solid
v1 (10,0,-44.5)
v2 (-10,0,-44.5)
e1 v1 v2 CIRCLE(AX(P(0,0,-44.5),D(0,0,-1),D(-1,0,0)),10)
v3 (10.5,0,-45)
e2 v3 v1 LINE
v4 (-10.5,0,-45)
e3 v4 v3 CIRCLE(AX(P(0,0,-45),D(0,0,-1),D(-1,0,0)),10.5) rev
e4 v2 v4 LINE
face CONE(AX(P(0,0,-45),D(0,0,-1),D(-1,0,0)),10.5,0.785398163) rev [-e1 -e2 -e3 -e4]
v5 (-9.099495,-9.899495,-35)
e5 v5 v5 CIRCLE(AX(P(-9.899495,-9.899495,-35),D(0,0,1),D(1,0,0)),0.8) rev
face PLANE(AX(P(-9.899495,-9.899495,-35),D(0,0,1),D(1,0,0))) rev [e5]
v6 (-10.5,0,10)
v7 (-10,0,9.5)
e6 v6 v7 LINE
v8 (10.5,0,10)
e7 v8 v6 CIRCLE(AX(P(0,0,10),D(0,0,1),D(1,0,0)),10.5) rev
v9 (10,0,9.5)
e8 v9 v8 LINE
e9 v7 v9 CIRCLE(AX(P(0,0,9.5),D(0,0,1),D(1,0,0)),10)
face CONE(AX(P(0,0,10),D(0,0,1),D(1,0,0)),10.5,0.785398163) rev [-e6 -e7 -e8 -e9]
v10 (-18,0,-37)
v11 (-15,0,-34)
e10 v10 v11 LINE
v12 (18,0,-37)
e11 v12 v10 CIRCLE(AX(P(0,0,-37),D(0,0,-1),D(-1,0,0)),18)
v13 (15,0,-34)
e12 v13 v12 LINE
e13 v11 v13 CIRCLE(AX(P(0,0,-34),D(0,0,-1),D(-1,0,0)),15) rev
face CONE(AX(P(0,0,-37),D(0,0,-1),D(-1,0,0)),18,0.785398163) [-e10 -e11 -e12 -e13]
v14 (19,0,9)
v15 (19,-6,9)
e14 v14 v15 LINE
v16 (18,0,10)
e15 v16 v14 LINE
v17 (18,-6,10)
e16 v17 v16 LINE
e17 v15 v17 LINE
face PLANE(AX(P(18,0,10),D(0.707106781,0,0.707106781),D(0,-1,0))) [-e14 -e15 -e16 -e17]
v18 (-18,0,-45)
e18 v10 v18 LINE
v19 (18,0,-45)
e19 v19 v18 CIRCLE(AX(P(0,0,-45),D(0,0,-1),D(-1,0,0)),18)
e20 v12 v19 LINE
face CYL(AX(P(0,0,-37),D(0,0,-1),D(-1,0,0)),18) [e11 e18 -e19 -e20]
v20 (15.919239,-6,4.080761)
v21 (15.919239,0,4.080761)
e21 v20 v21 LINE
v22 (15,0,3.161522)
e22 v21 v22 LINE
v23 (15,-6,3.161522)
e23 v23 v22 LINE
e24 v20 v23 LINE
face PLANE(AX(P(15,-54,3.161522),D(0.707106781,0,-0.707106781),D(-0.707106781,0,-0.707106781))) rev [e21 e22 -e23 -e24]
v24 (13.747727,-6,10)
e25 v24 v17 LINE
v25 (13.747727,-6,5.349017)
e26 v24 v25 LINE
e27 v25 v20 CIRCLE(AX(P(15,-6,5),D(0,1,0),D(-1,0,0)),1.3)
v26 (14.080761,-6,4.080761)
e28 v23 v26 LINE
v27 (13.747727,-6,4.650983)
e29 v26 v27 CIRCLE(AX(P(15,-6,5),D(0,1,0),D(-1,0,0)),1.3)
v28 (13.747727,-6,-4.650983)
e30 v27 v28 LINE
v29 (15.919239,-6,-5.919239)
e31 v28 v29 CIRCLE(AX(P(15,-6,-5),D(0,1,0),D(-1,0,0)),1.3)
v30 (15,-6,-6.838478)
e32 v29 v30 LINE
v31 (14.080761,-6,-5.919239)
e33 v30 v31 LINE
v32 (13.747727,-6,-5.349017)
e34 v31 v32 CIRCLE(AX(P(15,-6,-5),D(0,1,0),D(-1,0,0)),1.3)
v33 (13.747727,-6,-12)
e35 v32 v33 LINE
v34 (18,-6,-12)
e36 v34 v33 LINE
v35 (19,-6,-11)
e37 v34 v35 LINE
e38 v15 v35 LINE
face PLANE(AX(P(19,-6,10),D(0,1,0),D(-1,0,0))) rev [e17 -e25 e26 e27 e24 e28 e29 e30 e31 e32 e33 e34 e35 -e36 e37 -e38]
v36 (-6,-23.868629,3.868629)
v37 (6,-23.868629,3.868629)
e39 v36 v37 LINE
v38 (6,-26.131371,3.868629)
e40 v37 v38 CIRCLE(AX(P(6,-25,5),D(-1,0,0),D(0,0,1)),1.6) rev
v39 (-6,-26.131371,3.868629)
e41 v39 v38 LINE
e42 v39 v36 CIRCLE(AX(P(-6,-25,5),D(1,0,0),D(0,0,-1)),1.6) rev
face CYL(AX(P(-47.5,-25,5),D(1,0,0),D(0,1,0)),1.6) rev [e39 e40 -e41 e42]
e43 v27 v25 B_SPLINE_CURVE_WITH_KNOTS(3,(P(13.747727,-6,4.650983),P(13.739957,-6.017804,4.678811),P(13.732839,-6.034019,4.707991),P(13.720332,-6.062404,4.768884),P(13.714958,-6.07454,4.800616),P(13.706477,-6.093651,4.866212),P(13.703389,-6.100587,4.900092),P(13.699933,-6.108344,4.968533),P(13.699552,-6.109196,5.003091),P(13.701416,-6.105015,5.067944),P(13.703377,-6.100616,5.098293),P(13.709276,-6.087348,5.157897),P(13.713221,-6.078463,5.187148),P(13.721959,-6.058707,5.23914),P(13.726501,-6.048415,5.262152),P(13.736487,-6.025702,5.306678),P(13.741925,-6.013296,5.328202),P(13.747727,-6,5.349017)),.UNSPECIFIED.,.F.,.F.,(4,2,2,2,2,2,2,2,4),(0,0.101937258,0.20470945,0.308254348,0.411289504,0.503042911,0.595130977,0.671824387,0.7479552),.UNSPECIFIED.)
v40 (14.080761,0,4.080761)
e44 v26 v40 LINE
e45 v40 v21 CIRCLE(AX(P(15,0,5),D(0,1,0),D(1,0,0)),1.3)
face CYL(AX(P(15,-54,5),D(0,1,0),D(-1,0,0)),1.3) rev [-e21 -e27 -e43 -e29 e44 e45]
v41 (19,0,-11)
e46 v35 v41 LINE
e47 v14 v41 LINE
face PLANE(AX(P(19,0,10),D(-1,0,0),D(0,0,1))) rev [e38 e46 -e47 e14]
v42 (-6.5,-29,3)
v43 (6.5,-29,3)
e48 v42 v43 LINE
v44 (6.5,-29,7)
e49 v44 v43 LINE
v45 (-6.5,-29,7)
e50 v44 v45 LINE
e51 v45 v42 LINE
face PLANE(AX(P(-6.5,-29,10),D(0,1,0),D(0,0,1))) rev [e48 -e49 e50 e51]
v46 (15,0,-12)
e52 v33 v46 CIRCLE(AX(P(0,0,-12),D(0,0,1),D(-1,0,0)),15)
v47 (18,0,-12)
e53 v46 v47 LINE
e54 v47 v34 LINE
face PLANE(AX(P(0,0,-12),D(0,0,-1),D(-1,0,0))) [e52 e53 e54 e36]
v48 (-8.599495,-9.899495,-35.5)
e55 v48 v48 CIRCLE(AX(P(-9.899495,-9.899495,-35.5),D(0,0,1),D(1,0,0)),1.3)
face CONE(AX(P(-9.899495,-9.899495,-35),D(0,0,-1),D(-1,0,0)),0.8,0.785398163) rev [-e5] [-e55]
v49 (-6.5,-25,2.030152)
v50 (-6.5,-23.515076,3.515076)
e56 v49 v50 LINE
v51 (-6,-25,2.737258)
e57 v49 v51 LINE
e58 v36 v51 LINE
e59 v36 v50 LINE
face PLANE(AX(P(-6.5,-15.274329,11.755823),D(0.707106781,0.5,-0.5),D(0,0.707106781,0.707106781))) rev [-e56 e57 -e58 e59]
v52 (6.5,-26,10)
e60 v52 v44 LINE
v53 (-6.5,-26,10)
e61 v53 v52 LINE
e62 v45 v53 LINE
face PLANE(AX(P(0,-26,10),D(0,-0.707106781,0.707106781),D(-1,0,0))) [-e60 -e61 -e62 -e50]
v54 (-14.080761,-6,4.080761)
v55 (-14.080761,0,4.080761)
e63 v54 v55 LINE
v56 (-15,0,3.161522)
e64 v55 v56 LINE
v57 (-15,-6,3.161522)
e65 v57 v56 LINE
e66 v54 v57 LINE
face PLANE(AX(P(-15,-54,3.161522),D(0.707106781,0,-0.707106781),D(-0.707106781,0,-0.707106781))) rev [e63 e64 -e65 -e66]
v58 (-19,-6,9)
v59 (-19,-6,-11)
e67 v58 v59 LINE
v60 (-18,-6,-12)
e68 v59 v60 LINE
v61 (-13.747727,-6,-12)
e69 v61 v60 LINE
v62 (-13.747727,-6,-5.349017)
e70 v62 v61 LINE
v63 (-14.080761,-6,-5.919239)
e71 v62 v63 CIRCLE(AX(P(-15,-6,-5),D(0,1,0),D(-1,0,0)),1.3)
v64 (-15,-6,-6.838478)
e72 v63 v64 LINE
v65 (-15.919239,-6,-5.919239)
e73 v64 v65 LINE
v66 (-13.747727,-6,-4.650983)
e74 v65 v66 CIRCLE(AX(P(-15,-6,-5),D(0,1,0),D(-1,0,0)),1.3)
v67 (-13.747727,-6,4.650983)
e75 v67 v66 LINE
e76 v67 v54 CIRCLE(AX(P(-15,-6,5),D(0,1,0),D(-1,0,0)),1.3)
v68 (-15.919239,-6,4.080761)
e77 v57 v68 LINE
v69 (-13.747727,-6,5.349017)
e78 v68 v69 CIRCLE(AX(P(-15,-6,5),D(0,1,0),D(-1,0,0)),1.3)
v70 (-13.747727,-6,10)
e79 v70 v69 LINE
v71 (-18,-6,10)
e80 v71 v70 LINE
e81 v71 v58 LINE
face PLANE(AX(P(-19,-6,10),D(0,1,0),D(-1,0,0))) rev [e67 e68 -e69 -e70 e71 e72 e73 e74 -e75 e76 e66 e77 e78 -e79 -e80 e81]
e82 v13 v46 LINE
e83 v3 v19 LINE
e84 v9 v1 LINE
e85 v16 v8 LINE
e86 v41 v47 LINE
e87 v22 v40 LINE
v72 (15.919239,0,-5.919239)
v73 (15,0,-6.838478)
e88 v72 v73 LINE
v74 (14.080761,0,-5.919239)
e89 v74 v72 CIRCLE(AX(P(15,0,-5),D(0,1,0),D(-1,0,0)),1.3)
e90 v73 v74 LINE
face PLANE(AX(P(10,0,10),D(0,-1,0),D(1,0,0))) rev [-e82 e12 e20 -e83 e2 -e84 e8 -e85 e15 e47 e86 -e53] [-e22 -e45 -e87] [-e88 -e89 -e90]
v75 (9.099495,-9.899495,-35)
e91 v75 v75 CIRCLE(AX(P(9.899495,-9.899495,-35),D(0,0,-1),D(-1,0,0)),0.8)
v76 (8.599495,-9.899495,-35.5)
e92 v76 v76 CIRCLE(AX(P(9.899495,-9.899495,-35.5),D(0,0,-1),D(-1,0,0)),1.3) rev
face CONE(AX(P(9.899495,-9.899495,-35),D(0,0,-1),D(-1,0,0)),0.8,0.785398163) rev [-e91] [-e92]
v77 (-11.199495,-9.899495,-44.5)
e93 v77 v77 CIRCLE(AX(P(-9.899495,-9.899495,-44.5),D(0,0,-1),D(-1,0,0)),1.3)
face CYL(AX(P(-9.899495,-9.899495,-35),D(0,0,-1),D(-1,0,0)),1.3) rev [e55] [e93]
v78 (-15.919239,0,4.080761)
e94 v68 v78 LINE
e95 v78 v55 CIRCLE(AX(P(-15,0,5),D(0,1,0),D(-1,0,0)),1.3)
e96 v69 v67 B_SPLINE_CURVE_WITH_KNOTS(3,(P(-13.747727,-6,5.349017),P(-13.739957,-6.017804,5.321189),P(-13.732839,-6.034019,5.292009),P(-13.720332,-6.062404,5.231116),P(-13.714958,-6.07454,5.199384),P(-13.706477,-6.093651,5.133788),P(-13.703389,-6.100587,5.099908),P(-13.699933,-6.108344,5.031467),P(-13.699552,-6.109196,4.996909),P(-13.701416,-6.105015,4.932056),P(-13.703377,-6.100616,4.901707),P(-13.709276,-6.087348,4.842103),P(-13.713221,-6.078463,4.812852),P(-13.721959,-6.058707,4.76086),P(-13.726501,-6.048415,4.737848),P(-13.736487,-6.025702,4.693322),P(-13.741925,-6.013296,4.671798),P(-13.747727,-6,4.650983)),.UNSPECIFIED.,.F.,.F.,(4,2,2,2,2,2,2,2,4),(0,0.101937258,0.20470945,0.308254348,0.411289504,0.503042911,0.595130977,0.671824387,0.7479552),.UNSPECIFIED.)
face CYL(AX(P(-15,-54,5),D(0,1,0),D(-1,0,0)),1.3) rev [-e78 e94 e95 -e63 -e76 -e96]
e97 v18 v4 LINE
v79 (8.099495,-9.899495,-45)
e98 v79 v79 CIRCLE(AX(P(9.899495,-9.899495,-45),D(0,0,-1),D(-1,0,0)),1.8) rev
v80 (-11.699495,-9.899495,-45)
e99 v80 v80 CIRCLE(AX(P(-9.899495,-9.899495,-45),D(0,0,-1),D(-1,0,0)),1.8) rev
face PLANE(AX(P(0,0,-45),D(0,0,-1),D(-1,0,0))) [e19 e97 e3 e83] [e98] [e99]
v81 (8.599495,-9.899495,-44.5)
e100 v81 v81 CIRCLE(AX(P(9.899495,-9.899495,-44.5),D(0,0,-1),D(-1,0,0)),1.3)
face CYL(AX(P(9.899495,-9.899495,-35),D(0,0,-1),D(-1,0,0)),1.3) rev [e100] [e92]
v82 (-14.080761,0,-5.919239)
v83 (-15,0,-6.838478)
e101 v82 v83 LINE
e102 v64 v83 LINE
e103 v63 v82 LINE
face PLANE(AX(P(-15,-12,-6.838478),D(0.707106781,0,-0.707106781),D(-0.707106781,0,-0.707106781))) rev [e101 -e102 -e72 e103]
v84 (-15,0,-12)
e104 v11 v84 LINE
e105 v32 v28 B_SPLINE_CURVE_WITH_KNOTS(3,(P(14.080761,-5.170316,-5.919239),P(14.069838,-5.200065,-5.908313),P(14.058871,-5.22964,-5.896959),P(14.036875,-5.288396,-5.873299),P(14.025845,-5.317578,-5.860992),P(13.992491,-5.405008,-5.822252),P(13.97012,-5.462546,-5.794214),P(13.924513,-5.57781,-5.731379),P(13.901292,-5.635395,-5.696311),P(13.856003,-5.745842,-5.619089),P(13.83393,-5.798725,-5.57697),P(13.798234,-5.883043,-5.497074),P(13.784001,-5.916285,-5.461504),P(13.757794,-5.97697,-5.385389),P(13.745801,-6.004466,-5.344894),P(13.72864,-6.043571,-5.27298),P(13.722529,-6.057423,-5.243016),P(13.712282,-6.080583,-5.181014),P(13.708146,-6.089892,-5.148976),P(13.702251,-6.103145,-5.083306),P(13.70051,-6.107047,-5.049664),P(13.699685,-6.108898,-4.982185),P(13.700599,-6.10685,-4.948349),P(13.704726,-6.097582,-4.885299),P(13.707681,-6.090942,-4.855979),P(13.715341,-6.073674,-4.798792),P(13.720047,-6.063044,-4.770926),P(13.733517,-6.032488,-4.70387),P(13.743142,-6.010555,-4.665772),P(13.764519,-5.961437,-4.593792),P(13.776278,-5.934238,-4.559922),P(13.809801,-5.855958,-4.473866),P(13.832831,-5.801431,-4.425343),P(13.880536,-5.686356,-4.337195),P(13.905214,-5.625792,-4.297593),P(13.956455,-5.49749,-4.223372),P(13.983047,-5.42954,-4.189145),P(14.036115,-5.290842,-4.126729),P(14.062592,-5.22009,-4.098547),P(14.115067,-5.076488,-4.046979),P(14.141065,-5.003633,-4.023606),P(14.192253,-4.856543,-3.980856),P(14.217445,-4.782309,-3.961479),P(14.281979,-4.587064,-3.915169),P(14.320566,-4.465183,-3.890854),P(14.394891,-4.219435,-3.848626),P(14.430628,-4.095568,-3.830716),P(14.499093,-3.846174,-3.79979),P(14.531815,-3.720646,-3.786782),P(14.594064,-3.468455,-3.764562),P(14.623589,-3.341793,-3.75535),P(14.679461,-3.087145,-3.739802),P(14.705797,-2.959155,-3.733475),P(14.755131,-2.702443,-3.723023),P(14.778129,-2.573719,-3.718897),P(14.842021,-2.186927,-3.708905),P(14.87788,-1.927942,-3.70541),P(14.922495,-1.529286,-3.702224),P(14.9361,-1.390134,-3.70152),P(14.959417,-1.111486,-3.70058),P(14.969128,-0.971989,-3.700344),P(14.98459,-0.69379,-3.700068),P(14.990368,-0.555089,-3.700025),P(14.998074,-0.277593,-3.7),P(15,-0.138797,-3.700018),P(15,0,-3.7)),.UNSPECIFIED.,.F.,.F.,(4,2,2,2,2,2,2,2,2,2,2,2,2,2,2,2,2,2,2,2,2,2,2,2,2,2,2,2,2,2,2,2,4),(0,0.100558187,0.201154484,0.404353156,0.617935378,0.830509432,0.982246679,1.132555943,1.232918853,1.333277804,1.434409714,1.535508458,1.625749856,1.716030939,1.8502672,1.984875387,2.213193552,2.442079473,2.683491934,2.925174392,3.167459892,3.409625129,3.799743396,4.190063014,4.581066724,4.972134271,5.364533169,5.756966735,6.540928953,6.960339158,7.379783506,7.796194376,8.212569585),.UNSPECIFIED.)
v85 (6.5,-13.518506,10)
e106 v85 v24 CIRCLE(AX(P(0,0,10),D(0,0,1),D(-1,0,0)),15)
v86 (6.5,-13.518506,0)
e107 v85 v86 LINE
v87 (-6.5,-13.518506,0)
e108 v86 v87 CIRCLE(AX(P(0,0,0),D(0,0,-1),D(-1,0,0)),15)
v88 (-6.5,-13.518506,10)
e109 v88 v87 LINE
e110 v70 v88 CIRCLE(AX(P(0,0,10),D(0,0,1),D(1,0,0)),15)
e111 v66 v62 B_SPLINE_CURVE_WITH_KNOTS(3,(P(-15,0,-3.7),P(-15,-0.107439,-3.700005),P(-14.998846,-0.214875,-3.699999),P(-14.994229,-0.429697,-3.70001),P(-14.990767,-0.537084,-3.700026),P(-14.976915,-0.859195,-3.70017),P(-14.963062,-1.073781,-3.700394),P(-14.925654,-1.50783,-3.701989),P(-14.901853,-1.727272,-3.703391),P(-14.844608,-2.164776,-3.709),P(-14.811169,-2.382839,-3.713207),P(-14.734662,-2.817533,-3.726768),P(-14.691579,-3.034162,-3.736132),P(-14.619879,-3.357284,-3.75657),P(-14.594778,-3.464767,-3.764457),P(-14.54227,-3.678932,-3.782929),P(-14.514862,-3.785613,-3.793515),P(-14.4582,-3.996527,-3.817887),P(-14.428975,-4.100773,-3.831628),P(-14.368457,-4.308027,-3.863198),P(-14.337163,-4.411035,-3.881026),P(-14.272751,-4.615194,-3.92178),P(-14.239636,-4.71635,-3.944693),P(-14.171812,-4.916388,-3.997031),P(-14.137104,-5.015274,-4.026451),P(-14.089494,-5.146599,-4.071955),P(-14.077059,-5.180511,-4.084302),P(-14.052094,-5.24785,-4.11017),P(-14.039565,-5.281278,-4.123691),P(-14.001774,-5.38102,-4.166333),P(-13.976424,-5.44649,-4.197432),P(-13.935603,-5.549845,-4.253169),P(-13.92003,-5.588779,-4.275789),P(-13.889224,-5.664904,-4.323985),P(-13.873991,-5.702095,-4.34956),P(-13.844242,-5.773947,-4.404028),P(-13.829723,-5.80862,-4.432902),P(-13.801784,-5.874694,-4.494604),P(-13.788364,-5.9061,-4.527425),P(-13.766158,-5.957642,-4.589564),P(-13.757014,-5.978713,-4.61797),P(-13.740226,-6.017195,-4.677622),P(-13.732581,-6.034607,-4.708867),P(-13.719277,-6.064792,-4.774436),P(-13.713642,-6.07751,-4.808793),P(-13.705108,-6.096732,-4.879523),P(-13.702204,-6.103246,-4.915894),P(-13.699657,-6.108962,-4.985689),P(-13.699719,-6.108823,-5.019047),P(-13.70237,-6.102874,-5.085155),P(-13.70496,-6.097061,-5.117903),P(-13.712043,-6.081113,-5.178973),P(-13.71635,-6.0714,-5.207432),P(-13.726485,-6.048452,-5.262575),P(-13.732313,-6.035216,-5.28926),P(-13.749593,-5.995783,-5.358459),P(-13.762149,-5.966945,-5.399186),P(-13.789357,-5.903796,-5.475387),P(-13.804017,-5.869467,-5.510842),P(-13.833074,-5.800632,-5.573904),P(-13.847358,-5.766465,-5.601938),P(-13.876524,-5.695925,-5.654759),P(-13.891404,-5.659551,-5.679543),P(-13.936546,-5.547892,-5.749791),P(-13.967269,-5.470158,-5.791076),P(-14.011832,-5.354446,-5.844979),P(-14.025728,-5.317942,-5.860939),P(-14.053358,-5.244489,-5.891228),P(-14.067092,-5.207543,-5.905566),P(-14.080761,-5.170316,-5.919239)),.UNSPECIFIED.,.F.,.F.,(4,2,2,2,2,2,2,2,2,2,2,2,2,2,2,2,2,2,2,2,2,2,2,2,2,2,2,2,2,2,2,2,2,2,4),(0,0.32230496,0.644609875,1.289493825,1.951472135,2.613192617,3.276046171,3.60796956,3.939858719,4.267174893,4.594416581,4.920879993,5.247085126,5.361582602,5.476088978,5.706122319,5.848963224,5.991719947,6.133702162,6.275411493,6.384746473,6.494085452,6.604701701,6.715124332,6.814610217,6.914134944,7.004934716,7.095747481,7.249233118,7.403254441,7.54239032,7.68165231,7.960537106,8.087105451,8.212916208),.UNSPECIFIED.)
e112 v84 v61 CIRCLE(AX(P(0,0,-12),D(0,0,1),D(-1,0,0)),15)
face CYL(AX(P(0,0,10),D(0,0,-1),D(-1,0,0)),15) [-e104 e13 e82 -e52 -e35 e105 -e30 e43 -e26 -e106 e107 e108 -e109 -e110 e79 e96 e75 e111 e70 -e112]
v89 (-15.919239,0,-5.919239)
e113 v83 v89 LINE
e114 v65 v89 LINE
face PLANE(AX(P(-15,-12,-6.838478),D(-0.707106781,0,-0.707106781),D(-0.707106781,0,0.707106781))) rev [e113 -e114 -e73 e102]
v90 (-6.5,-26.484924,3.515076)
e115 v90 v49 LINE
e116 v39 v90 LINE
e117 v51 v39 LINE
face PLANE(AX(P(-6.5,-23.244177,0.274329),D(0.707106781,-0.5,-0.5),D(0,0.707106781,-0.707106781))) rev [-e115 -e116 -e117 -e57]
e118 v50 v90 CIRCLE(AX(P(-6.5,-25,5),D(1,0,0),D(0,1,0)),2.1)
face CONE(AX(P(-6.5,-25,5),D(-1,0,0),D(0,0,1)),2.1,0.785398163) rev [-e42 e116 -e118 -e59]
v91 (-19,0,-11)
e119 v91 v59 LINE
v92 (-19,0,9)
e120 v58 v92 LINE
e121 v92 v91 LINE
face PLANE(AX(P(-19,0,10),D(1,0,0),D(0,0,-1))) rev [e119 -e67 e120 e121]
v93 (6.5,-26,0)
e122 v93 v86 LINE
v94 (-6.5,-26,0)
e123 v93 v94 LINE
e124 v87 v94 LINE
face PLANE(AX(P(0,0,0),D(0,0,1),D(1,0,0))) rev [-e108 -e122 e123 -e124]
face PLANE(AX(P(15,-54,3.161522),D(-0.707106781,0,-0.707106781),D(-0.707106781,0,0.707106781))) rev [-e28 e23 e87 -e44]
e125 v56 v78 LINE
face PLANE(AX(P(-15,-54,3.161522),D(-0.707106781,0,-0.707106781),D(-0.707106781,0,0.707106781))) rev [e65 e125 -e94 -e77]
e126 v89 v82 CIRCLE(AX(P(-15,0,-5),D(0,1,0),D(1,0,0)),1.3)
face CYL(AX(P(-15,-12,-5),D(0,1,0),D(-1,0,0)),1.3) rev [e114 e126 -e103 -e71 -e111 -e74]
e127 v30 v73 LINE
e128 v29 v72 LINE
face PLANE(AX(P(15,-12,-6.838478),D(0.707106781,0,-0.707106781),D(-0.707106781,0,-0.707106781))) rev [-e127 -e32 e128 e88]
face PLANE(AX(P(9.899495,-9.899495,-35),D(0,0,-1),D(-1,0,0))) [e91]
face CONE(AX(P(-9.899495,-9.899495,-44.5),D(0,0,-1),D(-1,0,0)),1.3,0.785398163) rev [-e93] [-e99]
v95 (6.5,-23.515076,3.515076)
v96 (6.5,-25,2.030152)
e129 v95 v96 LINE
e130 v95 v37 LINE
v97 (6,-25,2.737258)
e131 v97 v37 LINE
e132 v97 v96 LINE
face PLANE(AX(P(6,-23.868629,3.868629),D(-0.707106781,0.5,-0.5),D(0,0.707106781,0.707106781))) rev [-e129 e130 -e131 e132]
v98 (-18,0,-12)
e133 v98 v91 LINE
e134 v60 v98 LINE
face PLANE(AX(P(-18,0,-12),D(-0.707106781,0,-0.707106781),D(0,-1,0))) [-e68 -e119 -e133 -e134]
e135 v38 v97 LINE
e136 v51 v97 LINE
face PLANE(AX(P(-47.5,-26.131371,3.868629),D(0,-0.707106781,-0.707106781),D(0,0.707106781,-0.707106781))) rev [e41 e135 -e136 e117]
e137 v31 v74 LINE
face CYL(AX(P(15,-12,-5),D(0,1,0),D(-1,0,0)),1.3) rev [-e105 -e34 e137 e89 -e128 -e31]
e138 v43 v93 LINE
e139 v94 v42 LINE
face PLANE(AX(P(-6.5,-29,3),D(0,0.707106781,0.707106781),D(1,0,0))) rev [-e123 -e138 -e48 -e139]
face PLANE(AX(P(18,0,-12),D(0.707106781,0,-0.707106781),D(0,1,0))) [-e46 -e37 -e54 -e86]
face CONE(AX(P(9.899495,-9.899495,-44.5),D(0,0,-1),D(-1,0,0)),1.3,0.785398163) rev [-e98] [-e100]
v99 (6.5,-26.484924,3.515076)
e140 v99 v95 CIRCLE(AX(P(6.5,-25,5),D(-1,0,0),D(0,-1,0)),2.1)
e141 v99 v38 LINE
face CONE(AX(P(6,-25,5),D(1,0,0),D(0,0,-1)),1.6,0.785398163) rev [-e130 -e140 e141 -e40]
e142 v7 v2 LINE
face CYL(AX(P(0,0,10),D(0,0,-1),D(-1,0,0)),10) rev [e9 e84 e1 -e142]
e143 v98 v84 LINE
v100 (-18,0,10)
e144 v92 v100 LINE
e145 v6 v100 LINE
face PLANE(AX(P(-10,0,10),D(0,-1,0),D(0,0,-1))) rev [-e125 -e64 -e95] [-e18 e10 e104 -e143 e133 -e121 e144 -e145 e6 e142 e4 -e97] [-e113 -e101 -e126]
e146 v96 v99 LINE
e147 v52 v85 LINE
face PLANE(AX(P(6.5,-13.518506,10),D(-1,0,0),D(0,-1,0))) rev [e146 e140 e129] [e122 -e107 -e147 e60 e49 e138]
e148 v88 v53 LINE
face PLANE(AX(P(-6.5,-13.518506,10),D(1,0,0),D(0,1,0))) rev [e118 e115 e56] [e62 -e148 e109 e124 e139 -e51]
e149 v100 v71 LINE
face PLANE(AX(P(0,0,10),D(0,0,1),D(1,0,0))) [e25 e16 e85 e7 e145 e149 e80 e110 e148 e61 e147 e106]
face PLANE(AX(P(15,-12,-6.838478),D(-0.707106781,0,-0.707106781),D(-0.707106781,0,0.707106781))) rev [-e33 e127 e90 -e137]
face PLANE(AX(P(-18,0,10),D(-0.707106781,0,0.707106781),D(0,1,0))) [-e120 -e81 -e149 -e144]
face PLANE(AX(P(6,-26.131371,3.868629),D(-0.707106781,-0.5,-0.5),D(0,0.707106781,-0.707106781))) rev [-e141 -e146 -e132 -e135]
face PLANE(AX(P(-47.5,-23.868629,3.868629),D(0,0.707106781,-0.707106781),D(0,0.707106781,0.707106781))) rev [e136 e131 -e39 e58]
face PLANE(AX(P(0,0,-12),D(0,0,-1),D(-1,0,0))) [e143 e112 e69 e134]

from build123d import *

# Parameters (mm, degrees)
EXTRUDE_1_DEPTH     = 10
CUT_EXTRUDE_1_DEPTH = 54
CUT_EXTRUDE_2_DEPTH = 54
EXTRUDE_START       = 45
EXTRUDE_2_DEPTH     = 45
CHAMFER_1_SIZE      = 3
EXTRUDE_START_2     = 12
EXTRUDE_3_DEPTH     = 12
CUT_EXTRUDE_4_DEPTH = 12
EXTRUDE_4_DEPTH     = 8
CHAMFER_7_SIZE      = 3
SKETCH_7_R          = 1.3
CUT_EXTRUDE_3_DEPTH = 10
CHAMFER_4_SIZE      = 1
CHAMFER_5_SIZE      = 0.5
CHAMFER_6_SIZE      = 0.5


with BuildPart() as part:
    # 草图1 → 凸台-拉伸1 (new body)
    with BuildSketch(Plane.XY):
        with BuildLine():
            Line((-10, 0), (-19, 0))
            Line((-19, 0), (-19, -6))
            Line((-19, -6), (-13.747727085, -6))
            ThreePointArc((-13.747727085, -6), (-10.799286806, -10.410350834), (-6.5, -13.518505835))
            Line((-6.5, -13.518505835), (-6.5, -29))
            Line((-6.5, -29), (6.5, -29))
            Line((6.5, -29), (6.5, -13.518505835))
            ThreePointArc((6.5, -13.518505835), (10.799286806, -10.410350834), (13.747727085, -6))
            Line((13.747727085, -6), (19, -6))
            Line((19, -6), (19, 0))
            Line((19, 0), (10, 0))
            ThreePointArc((10, 0), (0, -10), (-10, 0))
        make_face()
    extrude(amount=EXTRUDE_1_DEPTH)

    # 草图3 → 切除-拉伸1 (cut)
    with BuildSketch(Plane(origin=(6.5, 0, 0), x_dir=(0, 0, -1), z_dir=(1, 0, 0))):
        with BuildLine():
            Line((-3.86862915, -23.86862915), (-2.7372583, -25))
            Line((-2.7372583, -25), (-3.86862915, -26.13137085))
            ThreePointArc((-3.86862915, -26.13137085), (-6.6, -25), (-3.86862915, -23.86862915))
        make_face()
    extrude(amount=-CUT_EXTRUDE_1_DEPTH, mode=Mode.SUBTRACT)

    # 草图4 → 切除-拉伸2 (cut)
    with BuildSketch(Plane(origin=(0, 0, 0), x_dir=(1, 0, 0), z_dir=(0, 1, 0))):
        with BuildLine():
            Line((-15, -3.161522369), (-15.919238816, -4.080761184))
            ThreePointArc((-15.919238816, -4.080761184), (-15, -6.3), (-14.080761184, -4.080761184))
            Line((-14.080761184, -4.080761184), (-15, -3.161522369))
        make_face()
        with BuildLine():
            Line((15, -3.161522369), (14.080761184, -4.080761184))
            ThreePointArc((14.080761184, -4.080761184), (15, -6.3), (15.919238816, -4.080761184))
            Line((15.919238816, -4.080761184), (15, -3.161522369))
        make_face()
    extrude(amount=-CUT_EXTRUDE_2_DEPTH, mode=Mode.SUBTRACT)

    # 草图5 → 凸台-拉伸2 (add)
    with BuildSketch(Plane(origin=(0, 0, 0), x_dir=(-1, 0, 0), z_dir=(0, 0, -1)).offset(EXTRUDE_START)):
        with BuildLine():
            Line((10, 0), (15, 0))
            ThreePointArc((15, 0), (0, -15), (-15, 0))
            Line((-15, 0), (-10, 0))
            ThreePointArc((-10, 0), (0, -10), (10, 0))
        make_face()
    extrude(amount=-EXTRUDE_2_DEPTH)

    # 倒角1
    chamfer_1_edges = [part.edges().sort_by_distance(p)[0] for p in [
        (0, -29, 0),
        (0, -29, 10),
    ]]
    chamfer(chamfer_1_edges, length=CHAMFER_1_SIZE)

    # 草图8 → 凸台-拉伸3 (add)
    with BuildSketch(Plane(origin=(0, 0, 0), x_dir=(-1, 0, 0), z_dir=(0, 0, -1)).offset(EXTRUDE_START_2)):
        with BuildLine():
            Line((-15, 0), (-19, 0))
            Line((-19, 0), (-19, -6))
            Line((-19, -6), (-13.747727085, -6))
            ThreePointArc((-13.747727085, -6), (-14.683594694, -3.064644655), (-15, 0))
        make_face()
        with BuildLine():
            Line((13.747727085, -6), (19, -6))
            Line((19, -6), (19, 0))
            Line((19, 0), (15, 0))
            ThreePointArc((15, 0), (14.683594694, -3.064644655), (13.747727085, -6))
        make_face()
    extrude(amount=-EXTRUDE_3_DEPTH)

    # 草图9 → 切除-拉伸4 (cut)
    with BuildSketch(Plane(origin=(0, 0, 0), x_dir=(1, 0, 0), z_dir=(0, 1, 0))):
        with BuildLine():
            Line((15, 6.838477631), (14.080761184, 5.919238816))
            ThreePointArc((14.080761184, 5.919238816), (15, 3.7), (15.919238816, 5.919238816))
            Line((15.919238816, 5.919238816), (15, 6.838477631))
        make_face()
        with BuildLine():
            Line((-15, 6.838477631), (-15.919238816, 5.919238816))
            ThreePointArc((-15.919238816, 5.919238816), (-15, 3.7), (-14.080761184, 5.919238816))
            Line((-14.080761184, 5.919238816), (-15, 6.838477631))
        make_face()
    extrude(amount=-CUT_EXTRUDE_4_DEPTH, mode=Mode.SUBTRACT)

    # 草图10 → 凸台-拉伸4 (add)
    with BuildSketch(Plane(origin=(0, 0, -45), x_dir=(-1, 0, 0), z_dir=(0, 0, -1))):
        with BuildLine():
            Line((-15, 0), (-18, 0))
            ThreePointArc((-18, 0), (0, -18), (18, 0))
            Line((18, 0), (15, 0))
            ThreePointArc((15, 0), (0, -15), (-15, 0))
        make_face()
    extrude(amount=-EXTRUDE_4_DEPTH)

    # 倒角7
    chamfer_7_edges = [part.edges().sort_by_distance(p)[0] for p in [
        (0, -15, -37),
    ]]
    chamfer(chamfer_7_edges, length=CHAMFER_7_SIZE - 0.0001)  # a hair under: the kernel refuses the full size

    # 草图7 → 切除-拉伸3 (cut)
    with BuildSketch(Plane(origin=(0, 0, -45), x_dir=(-1, 0, 0), z_dir=(0, 0, -1))):
        with Locations((-9.899494937, -9.899494937)):
            Circle(SKETCH_7_R)
        with Locations(Location((9.899494937, -9.899494937, 0), (0, 0, 180))):
            Circle(SKETCH_7_R)
    extrude(amount=-CUT_EXTRUDE_3_DEPTH, mode=Mode.SUBTRACT)

    # 倒角4
    chamfer_4_edges = [part.edges().sort_by_distance(p)[0] for p in [
        (-19, -3, 10),
        (19, -3, -12),
        (-19, -3, -12),
        (19, -3, 10),
    ]]
    chamfer(chamfer_4_edges, length=CHAMFER_4_SIZE)

    # 倒角5
    chamfer_5_edges = [part.edges().sort_by_distance(p)[0] for p in [
        (-6.5, -25, 6.6),
        (-6.5, -24.434314575, 3.302943725),
        (-6.5, -25.565685425, 3.302943725),
        (6.5, -25, 6.6),
        (6.5, -25.565685425, 3.302943725),
        (6.5, -24.434314575, 3.302943725),
        (0, -10, 10),
        (0, -10, -45),
    ]]
    chamfer(chamfer_5_edges, length=CHAMFER_5_SIZE)

    # 倒角6
    chamfer_6_edges = [part.edges().sort_by_distance(p)[0] for p in [
        (11.199494937, -9.899494937, -35),
        (11.199494937, -9.899494937, -45),
        (-11.199494937, -9.899494937, -35),
        (-11.199494937, -9.899494937, -45),
    ]]
    chamfer(chamfer_6_edges, length=CHAMFER_6_SIZE)


solid = part.part
